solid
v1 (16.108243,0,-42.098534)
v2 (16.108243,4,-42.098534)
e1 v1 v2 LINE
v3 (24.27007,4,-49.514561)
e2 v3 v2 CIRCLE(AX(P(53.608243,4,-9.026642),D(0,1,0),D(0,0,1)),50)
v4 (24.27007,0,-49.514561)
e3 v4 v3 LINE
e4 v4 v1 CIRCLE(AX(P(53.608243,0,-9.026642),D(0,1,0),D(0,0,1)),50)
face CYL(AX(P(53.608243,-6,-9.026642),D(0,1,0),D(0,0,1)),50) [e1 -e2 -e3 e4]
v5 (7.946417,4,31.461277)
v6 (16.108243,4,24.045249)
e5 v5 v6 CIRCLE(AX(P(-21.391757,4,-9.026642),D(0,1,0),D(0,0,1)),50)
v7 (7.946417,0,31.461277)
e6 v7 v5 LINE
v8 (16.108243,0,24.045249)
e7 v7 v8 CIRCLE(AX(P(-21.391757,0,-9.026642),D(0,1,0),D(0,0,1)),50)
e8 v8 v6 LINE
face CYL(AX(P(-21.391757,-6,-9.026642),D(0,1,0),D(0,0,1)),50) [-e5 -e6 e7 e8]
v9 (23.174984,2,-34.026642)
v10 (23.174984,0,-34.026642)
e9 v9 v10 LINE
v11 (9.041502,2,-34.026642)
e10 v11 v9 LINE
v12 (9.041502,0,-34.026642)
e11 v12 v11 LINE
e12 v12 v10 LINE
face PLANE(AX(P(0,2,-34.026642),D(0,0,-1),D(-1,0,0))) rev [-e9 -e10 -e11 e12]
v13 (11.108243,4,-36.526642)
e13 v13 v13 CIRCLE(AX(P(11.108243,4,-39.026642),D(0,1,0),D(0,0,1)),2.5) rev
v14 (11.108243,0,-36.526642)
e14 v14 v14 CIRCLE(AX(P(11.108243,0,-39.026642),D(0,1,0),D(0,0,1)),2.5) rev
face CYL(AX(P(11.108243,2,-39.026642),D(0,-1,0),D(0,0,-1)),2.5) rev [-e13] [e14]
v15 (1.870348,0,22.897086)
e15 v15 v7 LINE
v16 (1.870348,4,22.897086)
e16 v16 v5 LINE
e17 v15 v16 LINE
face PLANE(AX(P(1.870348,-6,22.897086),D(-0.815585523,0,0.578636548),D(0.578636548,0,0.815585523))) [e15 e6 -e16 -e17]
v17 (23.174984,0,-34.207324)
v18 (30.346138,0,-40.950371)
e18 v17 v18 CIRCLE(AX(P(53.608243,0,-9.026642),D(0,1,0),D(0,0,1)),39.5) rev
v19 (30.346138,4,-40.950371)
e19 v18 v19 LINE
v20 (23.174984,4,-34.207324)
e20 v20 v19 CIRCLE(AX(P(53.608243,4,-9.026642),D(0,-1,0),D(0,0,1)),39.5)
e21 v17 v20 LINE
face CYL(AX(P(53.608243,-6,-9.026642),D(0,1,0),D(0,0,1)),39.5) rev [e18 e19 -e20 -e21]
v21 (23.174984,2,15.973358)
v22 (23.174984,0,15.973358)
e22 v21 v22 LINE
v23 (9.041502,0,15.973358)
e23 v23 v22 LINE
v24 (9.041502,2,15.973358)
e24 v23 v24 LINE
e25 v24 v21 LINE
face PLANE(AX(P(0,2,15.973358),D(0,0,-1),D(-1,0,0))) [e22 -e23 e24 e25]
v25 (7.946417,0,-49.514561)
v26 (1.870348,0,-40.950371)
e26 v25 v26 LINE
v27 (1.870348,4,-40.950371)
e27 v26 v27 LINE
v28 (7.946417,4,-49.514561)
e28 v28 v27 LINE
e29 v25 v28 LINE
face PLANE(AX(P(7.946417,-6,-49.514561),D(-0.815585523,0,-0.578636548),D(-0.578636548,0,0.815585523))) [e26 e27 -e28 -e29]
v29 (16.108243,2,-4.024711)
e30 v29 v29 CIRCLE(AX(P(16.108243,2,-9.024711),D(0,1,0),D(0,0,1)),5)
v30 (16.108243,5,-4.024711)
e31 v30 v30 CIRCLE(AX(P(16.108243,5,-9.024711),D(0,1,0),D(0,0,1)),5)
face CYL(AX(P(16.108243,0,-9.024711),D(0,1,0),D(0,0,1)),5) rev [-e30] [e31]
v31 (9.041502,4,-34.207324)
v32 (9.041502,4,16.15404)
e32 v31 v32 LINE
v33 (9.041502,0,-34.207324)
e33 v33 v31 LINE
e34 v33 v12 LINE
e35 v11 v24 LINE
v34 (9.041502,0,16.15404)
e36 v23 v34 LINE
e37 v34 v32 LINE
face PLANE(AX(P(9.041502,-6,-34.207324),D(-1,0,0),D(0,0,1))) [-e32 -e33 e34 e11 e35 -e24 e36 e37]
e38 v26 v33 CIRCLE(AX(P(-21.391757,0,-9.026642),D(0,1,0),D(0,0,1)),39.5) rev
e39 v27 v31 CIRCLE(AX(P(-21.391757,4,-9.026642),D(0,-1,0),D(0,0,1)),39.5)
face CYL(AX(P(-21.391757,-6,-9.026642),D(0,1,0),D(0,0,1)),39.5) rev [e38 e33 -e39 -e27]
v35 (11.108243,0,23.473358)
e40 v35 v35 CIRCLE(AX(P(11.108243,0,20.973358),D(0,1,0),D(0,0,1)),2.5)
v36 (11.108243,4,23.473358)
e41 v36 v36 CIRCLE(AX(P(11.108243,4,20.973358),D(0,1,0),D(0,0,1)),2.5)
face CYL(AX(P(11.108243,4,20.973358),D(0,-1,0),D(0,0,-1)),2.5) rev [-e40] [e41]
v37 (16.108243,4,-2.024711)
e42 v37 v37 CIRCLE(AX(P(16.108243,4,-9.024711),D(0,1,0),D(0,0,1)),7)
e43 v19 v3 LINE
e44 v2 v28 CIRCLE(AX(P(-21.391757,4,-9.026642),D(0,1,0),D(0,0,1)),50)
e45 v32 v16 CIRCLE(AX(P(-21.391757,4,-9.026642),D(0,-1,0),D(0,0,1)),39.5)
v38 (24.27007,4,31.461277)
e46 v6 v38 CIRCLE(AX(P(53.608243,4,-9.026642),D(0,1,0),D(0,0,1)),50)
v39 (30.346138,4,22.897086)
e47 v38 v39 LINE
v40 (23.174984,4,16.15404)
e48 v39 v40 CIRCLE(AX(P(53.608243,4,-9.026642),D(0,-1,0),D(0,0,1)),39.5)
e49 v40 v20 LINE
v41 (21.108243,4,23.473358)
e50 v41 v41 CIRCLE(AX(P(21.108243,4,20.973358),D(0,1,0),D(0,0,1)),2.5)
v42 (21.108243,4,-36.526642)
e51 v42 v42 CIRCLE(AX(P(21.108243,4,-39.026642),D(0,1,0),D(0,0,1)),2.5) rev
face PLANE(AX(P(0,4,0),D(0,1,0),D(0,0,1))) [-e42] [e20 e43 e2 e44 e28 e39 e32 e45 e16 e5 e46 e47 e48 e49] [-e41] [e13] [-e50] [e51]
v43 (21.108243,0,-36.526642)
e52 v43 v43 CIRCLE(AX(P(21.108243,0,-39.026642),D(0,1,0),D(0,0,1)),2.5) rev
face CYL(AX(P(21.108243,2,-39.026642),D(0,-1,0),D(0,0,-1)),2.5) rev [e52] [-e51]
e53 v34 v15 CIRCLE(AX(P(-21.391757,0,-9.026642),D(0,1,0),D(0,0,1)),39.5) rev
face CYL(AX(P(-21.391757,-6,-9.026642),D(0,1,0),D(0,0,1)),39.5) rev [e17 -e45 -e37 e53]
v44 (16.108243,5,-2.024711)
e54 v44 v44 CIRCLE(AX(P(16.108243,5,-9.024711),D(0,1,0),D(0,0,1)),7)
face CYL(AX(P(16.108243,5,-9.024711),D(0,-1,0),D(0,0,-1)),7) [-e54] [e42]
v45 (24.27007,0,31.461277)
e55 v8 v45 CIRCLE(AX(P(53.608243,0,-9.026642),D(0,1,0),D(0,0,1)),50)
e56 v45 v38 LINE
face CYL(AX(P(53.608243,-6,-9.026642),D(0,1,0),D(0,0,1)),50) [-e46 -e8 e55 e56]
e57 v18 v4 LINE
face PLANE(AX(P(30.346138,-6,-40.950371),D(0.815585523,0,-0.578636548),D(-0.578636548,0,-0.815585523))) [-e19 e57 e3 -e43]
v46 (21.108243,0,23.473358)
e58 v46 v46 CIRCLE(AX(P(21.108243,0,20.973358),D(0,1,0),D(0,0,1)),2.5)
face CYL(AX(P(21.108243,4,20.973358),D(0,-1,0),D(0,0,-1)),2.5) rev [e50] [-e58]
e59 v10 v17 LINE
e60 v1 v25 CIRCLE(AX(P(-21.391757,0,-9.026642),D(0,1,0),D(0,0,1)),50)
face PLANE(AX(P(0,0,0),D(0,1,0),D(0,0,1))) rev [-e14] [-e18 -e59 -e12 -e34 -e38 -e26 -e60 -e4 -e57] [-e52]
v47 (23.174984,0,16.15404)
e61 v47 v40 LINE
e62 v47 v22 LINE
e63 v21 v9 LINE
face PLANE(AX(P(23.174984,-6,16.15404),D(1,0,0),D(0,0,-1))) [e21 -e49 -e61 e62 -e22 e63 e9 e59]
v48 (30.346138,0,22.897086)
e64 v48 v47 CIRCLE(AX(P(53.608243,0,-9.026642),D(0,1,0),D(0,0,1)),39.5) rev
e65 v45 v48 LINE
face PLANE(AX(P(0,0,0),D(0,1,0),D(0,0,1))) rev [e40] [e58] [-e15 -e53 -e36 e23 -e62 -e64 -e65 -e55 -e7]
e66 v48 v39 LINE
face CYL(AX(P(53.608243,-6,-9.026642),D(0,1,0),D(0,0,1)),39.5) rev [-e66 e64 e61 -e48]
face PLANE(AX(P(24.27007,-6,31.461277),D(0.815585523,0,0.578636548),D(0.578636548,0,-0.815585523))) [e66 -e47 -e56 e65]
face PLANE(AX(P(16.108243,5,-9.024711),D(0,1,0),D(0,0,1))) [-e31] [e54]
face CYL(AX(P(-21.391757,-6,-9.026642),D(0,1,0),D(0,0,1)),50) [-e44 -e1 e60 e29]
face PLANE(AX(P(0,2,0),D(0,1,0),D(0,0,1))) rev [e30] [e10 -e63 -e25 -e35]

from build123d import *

# Parameters (mm, degrees)
SKETCH1_R               = 2.5
BOSS_EXTRUDE1_DEPTH     = 2
BOSS_EXTRUDE1_2_DEPTH   = 2
BOSS_EXTRUDE3_OUTLINE_R = 2.5
BOSS_EXTRUDE3_DEPTH     = 2
SKETCH6_R               = 5
CUT_EXTRUDE1_DEPTH      = 4
CUT_EXTRUDE2_START      = -10
CUT_EXTRUDE2_DEPTH      = 10
BOSS_EXTRUDE4_START     = 1
SKETCH8_R               = 7
SKETCH8_R_2             = 5
BOSS_EXTRUDE4_DEPTH     = 1


# Read off the part's stored shape, not the designer's step: Boss-Extrude3
with BuildPart() as part:
    # Sketch1 → Boss-Extrude1 (new body)
    with BuildSketch(Plane(origin=(0, 0, 0), x_dir=(1, 0, 0), z_dir=(0, 1, 0))):
        with BuildLine():
            ThreePointArc((23.674984177, 34.026642345), (27.138423224, 37.66837111), (31.041417883, 40.83447773))
            Line((31.041417883, 40.83447773), (24.387097577, 50.213711241))
            ThreePointArc((24.387097577, 50.213711241), (20.045094669, 46.759453741), (16.108243271, 42.849711395))
            ThreePointArc((16.108243271, 42.849711395), (12.171391874, 46.759453741), (7.829388966, 50.213711241))
            Line((7.829388966, 50.213711241), (1.175068659, 40.83447773))
            ThreePointArc((1.175068659, 40.83447773), (5.078063318, 37.66837111), (8.541502365, 34.026642345))
            Line((8.541502365, 34.026642345), (23.674984177, 34.026642345))
        make_face()
        with Locations(Location((11.108243271, 39.026642345, 0), (0, 0, 270))):
            Circle(SKETCH1_R, mode=Mode.SUBTRACT)
        with Locations(Location((21.108243271, 39.026642345, 0), (0, 0, 270))):
            Circle(SKETCH1_R, mode=Mode.SUBTRACT)
    extrude(amount=BOSS_EXTRUDE1_DEPTH)



with BuildPart() as body_2:
    # Sketch1 → Boss-Extrude1 2 (new body)
    with BuildSketch(Plane(origin=(0, 0, 0), x_dir=(1, 0, 0), z_dir=(0, 1, 0))):
        with BuildLine():
            Line((24.387097577, -32.160426552), (31.041417883, -22.781193041))
            ThreePointArc((31.041417883, -22.781193041), (27.138423224, -19.615086421), (23.674984177, -15.973357655))
            Line((23.674984177, -15.973357655), (8.541502365, -15.973357655))
            ThreePointArc((8.541502365, -15.973357655), (5.078063318, -19.615086421), (1.175068659, -22.781193041))
            Line((1.175068659, -22.781193041), (7.829388966, -32.160426552))
            ThreePointArc((7.829388966, -32.160426552), (12.171391874, -28.706169052), (16.108243271, -24.796426706))
            ThreePointArc((16.108243271, -24.796426706), (20.045094669, -28.706169052), (24.387097577, -32.160426552))
        make_face()
        with Locations(Location((11.108243271, -20.973357655, 0), (0, 0, 270))):
            Circle(SKETCH1_R, mode=Mode.SUBTRACT)
        with Locations(Location((21.108243271, -20.973357655, 0), (0, 0, 270))):
            Circle(SKETCH1_R, mode=Mode.SUBTRACT)
    extrude(amount=BOSS_EXTRUDE1_2_DEPTH)


with BuildPart() as part_1:
    add(part.part)

    add(body_2.part)  # Boss-Extrude3 merges body 2
    # Boss-Extrude3 outline → Boss-Extrude3 (add)
    with BuildSketch(Plane(origin=(0, 2, 0), x_dir=(1, 0, 0), z_dir=(0, 1, 0))):
        with BuildLine():
            ThreePointArc((16.108243271, 42.849711395), (12.171391874, 46.759453741), (7.829388966, 50.213711241))
            Line((7.829388966, 50.213711241), (1.175068659, 40.83447773))
            ThreePointArc((1.175068659, 40.83447773), (5.078063318, 37.66837111), (8.541502365, 34.026642345))
            Line((8.541502365, 34.026642345), (8.541502365, -15.973357655))
            ThreePointArc((8.541502365, -15.973357655), (5.078063318, -19.615086421), (1.175068659, -22.781193041))
            Line((1.175068659, -22.781193041), (7.829388966, -32.160426552))
            ThreePointArc((7.829388966, -32.160426552), (12.171391874, -28.706169052), (16.108243271, -24.796426706))
            ThreePointArc((16.108243271, -24.796426706), (20.045094669, -28.706169052), (24.387097577, -32.160426552))
            Line((24.387097577, -32.160426552), (31.041417883, -22.781193041))
            ThreePointArc((31.041417883, -22.781193041), (27.138423224, -19.615086421), (23.674984177, -15.973357655))
            Line((23.674984177, -15.973357655), (23.674984177, 34.026642345))
            ThreePointArc((23.674984177, 34.026642345), (27.138423224, 37.66837111), (31.041417883, 40.83447773))
            Line((31.041417883, 40.83447773), (24.387097577, 50.213711241))
            ThreePointArc((24.387097577, 50.213711241), (20.045094669, 46.759453741), (16.108243271, 42.849711395))
        make_face()
        with Locations((11.108243271, -20.973357655)):
            Circle(BOSS_EXTRUDE3_OUTLINE_R, mode=Mode.SUBTRACT)
        with Locations((21.108243271, -20.973357655)):
            Circle(BOSS_EXTRUDE3_OUTLINE_R, mode=Mode.SUBTRACT)
        with Locations((11.108243271, 39.026642345)):
            Circle(BOSS_EXTRUDE3_OUTLINE_R, mode=Mode.SUBTRACT)
        with Locations((21.108243271, 39.026642345)):
            Circle(BOSS_EXTRUDE3_OUTLINE_R, mode=Mode.SUBTRACT)
    extrude(amount=BOSS_EXTRUDE3_DEPTH)

    # Sketch6 → Cut-Extrude1 (cut)
    with BuildSketch(Plane(origin=(0, 4, 0), x_dir=(1, 0, 0), z_dir=(0, 1, 0))):
        with Locations(Location((16.108243271, 9.024711395, 0), (0, 0, 270))):
            Circle(SKETCH6_R)
    extrude(amount=-CUT_EXTRUDE1_DEPTH, mode=Mode.SUBTRACT)

    # Sketch7 → Cut-Extrude2 (cut)
    with BuildSketch(Plane(origin=(0, 4, 0), x_dir=(1, 0, 0), z_dir=(0, 1, 0)).offset(CUT_EXTRUDE2_START)):
        with BuildLine():
            Line((1.175068659, -22.781193041), (7.829388966, -32.160426552))
            ThreePointArc((7.829388966, -32.160426552), (12.171391874, -28.706169052), (16.108243271, -24.796426706))
            ThreePointArc((16.108243271, -24.796426706), (20.045094669, -28.706169052), (24.387097577, -32.160426552))
            Line((24.387097577, -32.160426552), (31.041417883, -22.781193041))
            ThreePointArc((31.041417883, -22.781193041), (27.138423224, -19.615086421), (23.674984177, -15.973357655))
            Line((23.674984177, -15.973357655), (23.674984177, 34.026642345))
            ThreePointArc((23.674984177, 34.026642345), (27.138423224, 37.66837111), (31.041417883, 40.83447773))
            Line((31.041417883, 40.83447773), (24.387097577, 50.213711241))
            ThreePointArc((24.387097577, 50.213711241), (20.045094669, 46.759453741), (16.108243271, 42.849711395))
            ThreePointArc((16.108243271, 42.849711395), (12.171391874, 46.759453741), (7.829388966, 50.213711241))
            Line((7.829388966, 50.213711241), (1.175068659, 40.83447773))
            ThreePointArc((1.175068659, 40.83447773), (5.078063318, 37.66837111), (8.541502365, 34.026642345))
            Line((8.541502365, 34.026642345), (8.541502365, -15.973357655))
            ThreePointArc((8.541502365, -15.973357655), (5.078063318, -19.615086421), (1.175068659, -22.781193041))
        make_face()
        with BuildLine():
            Line((1.870348493, -22.897086458), (7.946416825, -31.461276502))
            ThreePointArc((7.946416825, -31.461276502), (12.232412061, -27.97896903), (16.108243271, -24.045249044))
            ThreePointArc((16.108243271, -24.045249044), (19.984074481, -27.97896903), (24.270069717, -31.461276502))
            Line((24.270069717, -31.461276502), (30.34613805, -22.897086458))
            ThreePointArc((30.34613805, -22.897086458), (26.549691802, -19.749820127), (23.174984177, -16.154039555))
            Line((23.174984177, -16.154039555), (23.174984177, 34.207324244))
            ThreePointArc((23.174984177, 34.207324244), (26.549691802, 37.803104816), (30.34613805, 40.950371147))
            Line((30.34613805, 40.950371147), (24.270069717, 49.514561191))
            ThreePointArc((24.270069717, 49.514561191), (19.984074481, 46.032253719), (16.108243271, 42.098533733))
            ThreePointArc((16.108243271, 42.098533733), (12.232412061, 46.032253719), (7.946416825, 49.514561191))
            Line((7.946416825, 49.514561191), (1.870348493, 40.950371147))
            ThreePointArc((1.870348493, 40.950371147), (5.666794741, 37.803104816), (9.041502365, 34.207324244))
            Line((9.041502365, 34.207324244), (9.041502365, -16.154039555))
            ThreePointArc((9.041502365, -16.154039555), (5.666794741, -19.749820127), (1.870348493, -22.897086458))
        make_face(mode=Mode.SUBTRACT)
    extrude(amount=CUT_EXTRUDE2_DEPTH, mode=Mode.SUBTRACT)

    # Sketch8 → Boss-Extrude4 (add)
    with BuildSketch(Plane(origin=(0, 4, 0), x_dir=(1, 0, 0), z_dir=(0, 1, 0)).offset(BOSS_EXTRUDE4_START)):
        with Locations(Location((16.108243271, 9.024711395, 0), (0, 0, 270))):
            Circle(SKETCH8_R)
        with Locations(Location((16.108243271, 9.024711395, 0), (0, 0, 270))):
            Circle(SKETCH8_R_2, mode=Mode.SUBTRACT)
    extrude(amount=-BOSS_EXTRUDE4_DEPTH)


solid = part_1.part
